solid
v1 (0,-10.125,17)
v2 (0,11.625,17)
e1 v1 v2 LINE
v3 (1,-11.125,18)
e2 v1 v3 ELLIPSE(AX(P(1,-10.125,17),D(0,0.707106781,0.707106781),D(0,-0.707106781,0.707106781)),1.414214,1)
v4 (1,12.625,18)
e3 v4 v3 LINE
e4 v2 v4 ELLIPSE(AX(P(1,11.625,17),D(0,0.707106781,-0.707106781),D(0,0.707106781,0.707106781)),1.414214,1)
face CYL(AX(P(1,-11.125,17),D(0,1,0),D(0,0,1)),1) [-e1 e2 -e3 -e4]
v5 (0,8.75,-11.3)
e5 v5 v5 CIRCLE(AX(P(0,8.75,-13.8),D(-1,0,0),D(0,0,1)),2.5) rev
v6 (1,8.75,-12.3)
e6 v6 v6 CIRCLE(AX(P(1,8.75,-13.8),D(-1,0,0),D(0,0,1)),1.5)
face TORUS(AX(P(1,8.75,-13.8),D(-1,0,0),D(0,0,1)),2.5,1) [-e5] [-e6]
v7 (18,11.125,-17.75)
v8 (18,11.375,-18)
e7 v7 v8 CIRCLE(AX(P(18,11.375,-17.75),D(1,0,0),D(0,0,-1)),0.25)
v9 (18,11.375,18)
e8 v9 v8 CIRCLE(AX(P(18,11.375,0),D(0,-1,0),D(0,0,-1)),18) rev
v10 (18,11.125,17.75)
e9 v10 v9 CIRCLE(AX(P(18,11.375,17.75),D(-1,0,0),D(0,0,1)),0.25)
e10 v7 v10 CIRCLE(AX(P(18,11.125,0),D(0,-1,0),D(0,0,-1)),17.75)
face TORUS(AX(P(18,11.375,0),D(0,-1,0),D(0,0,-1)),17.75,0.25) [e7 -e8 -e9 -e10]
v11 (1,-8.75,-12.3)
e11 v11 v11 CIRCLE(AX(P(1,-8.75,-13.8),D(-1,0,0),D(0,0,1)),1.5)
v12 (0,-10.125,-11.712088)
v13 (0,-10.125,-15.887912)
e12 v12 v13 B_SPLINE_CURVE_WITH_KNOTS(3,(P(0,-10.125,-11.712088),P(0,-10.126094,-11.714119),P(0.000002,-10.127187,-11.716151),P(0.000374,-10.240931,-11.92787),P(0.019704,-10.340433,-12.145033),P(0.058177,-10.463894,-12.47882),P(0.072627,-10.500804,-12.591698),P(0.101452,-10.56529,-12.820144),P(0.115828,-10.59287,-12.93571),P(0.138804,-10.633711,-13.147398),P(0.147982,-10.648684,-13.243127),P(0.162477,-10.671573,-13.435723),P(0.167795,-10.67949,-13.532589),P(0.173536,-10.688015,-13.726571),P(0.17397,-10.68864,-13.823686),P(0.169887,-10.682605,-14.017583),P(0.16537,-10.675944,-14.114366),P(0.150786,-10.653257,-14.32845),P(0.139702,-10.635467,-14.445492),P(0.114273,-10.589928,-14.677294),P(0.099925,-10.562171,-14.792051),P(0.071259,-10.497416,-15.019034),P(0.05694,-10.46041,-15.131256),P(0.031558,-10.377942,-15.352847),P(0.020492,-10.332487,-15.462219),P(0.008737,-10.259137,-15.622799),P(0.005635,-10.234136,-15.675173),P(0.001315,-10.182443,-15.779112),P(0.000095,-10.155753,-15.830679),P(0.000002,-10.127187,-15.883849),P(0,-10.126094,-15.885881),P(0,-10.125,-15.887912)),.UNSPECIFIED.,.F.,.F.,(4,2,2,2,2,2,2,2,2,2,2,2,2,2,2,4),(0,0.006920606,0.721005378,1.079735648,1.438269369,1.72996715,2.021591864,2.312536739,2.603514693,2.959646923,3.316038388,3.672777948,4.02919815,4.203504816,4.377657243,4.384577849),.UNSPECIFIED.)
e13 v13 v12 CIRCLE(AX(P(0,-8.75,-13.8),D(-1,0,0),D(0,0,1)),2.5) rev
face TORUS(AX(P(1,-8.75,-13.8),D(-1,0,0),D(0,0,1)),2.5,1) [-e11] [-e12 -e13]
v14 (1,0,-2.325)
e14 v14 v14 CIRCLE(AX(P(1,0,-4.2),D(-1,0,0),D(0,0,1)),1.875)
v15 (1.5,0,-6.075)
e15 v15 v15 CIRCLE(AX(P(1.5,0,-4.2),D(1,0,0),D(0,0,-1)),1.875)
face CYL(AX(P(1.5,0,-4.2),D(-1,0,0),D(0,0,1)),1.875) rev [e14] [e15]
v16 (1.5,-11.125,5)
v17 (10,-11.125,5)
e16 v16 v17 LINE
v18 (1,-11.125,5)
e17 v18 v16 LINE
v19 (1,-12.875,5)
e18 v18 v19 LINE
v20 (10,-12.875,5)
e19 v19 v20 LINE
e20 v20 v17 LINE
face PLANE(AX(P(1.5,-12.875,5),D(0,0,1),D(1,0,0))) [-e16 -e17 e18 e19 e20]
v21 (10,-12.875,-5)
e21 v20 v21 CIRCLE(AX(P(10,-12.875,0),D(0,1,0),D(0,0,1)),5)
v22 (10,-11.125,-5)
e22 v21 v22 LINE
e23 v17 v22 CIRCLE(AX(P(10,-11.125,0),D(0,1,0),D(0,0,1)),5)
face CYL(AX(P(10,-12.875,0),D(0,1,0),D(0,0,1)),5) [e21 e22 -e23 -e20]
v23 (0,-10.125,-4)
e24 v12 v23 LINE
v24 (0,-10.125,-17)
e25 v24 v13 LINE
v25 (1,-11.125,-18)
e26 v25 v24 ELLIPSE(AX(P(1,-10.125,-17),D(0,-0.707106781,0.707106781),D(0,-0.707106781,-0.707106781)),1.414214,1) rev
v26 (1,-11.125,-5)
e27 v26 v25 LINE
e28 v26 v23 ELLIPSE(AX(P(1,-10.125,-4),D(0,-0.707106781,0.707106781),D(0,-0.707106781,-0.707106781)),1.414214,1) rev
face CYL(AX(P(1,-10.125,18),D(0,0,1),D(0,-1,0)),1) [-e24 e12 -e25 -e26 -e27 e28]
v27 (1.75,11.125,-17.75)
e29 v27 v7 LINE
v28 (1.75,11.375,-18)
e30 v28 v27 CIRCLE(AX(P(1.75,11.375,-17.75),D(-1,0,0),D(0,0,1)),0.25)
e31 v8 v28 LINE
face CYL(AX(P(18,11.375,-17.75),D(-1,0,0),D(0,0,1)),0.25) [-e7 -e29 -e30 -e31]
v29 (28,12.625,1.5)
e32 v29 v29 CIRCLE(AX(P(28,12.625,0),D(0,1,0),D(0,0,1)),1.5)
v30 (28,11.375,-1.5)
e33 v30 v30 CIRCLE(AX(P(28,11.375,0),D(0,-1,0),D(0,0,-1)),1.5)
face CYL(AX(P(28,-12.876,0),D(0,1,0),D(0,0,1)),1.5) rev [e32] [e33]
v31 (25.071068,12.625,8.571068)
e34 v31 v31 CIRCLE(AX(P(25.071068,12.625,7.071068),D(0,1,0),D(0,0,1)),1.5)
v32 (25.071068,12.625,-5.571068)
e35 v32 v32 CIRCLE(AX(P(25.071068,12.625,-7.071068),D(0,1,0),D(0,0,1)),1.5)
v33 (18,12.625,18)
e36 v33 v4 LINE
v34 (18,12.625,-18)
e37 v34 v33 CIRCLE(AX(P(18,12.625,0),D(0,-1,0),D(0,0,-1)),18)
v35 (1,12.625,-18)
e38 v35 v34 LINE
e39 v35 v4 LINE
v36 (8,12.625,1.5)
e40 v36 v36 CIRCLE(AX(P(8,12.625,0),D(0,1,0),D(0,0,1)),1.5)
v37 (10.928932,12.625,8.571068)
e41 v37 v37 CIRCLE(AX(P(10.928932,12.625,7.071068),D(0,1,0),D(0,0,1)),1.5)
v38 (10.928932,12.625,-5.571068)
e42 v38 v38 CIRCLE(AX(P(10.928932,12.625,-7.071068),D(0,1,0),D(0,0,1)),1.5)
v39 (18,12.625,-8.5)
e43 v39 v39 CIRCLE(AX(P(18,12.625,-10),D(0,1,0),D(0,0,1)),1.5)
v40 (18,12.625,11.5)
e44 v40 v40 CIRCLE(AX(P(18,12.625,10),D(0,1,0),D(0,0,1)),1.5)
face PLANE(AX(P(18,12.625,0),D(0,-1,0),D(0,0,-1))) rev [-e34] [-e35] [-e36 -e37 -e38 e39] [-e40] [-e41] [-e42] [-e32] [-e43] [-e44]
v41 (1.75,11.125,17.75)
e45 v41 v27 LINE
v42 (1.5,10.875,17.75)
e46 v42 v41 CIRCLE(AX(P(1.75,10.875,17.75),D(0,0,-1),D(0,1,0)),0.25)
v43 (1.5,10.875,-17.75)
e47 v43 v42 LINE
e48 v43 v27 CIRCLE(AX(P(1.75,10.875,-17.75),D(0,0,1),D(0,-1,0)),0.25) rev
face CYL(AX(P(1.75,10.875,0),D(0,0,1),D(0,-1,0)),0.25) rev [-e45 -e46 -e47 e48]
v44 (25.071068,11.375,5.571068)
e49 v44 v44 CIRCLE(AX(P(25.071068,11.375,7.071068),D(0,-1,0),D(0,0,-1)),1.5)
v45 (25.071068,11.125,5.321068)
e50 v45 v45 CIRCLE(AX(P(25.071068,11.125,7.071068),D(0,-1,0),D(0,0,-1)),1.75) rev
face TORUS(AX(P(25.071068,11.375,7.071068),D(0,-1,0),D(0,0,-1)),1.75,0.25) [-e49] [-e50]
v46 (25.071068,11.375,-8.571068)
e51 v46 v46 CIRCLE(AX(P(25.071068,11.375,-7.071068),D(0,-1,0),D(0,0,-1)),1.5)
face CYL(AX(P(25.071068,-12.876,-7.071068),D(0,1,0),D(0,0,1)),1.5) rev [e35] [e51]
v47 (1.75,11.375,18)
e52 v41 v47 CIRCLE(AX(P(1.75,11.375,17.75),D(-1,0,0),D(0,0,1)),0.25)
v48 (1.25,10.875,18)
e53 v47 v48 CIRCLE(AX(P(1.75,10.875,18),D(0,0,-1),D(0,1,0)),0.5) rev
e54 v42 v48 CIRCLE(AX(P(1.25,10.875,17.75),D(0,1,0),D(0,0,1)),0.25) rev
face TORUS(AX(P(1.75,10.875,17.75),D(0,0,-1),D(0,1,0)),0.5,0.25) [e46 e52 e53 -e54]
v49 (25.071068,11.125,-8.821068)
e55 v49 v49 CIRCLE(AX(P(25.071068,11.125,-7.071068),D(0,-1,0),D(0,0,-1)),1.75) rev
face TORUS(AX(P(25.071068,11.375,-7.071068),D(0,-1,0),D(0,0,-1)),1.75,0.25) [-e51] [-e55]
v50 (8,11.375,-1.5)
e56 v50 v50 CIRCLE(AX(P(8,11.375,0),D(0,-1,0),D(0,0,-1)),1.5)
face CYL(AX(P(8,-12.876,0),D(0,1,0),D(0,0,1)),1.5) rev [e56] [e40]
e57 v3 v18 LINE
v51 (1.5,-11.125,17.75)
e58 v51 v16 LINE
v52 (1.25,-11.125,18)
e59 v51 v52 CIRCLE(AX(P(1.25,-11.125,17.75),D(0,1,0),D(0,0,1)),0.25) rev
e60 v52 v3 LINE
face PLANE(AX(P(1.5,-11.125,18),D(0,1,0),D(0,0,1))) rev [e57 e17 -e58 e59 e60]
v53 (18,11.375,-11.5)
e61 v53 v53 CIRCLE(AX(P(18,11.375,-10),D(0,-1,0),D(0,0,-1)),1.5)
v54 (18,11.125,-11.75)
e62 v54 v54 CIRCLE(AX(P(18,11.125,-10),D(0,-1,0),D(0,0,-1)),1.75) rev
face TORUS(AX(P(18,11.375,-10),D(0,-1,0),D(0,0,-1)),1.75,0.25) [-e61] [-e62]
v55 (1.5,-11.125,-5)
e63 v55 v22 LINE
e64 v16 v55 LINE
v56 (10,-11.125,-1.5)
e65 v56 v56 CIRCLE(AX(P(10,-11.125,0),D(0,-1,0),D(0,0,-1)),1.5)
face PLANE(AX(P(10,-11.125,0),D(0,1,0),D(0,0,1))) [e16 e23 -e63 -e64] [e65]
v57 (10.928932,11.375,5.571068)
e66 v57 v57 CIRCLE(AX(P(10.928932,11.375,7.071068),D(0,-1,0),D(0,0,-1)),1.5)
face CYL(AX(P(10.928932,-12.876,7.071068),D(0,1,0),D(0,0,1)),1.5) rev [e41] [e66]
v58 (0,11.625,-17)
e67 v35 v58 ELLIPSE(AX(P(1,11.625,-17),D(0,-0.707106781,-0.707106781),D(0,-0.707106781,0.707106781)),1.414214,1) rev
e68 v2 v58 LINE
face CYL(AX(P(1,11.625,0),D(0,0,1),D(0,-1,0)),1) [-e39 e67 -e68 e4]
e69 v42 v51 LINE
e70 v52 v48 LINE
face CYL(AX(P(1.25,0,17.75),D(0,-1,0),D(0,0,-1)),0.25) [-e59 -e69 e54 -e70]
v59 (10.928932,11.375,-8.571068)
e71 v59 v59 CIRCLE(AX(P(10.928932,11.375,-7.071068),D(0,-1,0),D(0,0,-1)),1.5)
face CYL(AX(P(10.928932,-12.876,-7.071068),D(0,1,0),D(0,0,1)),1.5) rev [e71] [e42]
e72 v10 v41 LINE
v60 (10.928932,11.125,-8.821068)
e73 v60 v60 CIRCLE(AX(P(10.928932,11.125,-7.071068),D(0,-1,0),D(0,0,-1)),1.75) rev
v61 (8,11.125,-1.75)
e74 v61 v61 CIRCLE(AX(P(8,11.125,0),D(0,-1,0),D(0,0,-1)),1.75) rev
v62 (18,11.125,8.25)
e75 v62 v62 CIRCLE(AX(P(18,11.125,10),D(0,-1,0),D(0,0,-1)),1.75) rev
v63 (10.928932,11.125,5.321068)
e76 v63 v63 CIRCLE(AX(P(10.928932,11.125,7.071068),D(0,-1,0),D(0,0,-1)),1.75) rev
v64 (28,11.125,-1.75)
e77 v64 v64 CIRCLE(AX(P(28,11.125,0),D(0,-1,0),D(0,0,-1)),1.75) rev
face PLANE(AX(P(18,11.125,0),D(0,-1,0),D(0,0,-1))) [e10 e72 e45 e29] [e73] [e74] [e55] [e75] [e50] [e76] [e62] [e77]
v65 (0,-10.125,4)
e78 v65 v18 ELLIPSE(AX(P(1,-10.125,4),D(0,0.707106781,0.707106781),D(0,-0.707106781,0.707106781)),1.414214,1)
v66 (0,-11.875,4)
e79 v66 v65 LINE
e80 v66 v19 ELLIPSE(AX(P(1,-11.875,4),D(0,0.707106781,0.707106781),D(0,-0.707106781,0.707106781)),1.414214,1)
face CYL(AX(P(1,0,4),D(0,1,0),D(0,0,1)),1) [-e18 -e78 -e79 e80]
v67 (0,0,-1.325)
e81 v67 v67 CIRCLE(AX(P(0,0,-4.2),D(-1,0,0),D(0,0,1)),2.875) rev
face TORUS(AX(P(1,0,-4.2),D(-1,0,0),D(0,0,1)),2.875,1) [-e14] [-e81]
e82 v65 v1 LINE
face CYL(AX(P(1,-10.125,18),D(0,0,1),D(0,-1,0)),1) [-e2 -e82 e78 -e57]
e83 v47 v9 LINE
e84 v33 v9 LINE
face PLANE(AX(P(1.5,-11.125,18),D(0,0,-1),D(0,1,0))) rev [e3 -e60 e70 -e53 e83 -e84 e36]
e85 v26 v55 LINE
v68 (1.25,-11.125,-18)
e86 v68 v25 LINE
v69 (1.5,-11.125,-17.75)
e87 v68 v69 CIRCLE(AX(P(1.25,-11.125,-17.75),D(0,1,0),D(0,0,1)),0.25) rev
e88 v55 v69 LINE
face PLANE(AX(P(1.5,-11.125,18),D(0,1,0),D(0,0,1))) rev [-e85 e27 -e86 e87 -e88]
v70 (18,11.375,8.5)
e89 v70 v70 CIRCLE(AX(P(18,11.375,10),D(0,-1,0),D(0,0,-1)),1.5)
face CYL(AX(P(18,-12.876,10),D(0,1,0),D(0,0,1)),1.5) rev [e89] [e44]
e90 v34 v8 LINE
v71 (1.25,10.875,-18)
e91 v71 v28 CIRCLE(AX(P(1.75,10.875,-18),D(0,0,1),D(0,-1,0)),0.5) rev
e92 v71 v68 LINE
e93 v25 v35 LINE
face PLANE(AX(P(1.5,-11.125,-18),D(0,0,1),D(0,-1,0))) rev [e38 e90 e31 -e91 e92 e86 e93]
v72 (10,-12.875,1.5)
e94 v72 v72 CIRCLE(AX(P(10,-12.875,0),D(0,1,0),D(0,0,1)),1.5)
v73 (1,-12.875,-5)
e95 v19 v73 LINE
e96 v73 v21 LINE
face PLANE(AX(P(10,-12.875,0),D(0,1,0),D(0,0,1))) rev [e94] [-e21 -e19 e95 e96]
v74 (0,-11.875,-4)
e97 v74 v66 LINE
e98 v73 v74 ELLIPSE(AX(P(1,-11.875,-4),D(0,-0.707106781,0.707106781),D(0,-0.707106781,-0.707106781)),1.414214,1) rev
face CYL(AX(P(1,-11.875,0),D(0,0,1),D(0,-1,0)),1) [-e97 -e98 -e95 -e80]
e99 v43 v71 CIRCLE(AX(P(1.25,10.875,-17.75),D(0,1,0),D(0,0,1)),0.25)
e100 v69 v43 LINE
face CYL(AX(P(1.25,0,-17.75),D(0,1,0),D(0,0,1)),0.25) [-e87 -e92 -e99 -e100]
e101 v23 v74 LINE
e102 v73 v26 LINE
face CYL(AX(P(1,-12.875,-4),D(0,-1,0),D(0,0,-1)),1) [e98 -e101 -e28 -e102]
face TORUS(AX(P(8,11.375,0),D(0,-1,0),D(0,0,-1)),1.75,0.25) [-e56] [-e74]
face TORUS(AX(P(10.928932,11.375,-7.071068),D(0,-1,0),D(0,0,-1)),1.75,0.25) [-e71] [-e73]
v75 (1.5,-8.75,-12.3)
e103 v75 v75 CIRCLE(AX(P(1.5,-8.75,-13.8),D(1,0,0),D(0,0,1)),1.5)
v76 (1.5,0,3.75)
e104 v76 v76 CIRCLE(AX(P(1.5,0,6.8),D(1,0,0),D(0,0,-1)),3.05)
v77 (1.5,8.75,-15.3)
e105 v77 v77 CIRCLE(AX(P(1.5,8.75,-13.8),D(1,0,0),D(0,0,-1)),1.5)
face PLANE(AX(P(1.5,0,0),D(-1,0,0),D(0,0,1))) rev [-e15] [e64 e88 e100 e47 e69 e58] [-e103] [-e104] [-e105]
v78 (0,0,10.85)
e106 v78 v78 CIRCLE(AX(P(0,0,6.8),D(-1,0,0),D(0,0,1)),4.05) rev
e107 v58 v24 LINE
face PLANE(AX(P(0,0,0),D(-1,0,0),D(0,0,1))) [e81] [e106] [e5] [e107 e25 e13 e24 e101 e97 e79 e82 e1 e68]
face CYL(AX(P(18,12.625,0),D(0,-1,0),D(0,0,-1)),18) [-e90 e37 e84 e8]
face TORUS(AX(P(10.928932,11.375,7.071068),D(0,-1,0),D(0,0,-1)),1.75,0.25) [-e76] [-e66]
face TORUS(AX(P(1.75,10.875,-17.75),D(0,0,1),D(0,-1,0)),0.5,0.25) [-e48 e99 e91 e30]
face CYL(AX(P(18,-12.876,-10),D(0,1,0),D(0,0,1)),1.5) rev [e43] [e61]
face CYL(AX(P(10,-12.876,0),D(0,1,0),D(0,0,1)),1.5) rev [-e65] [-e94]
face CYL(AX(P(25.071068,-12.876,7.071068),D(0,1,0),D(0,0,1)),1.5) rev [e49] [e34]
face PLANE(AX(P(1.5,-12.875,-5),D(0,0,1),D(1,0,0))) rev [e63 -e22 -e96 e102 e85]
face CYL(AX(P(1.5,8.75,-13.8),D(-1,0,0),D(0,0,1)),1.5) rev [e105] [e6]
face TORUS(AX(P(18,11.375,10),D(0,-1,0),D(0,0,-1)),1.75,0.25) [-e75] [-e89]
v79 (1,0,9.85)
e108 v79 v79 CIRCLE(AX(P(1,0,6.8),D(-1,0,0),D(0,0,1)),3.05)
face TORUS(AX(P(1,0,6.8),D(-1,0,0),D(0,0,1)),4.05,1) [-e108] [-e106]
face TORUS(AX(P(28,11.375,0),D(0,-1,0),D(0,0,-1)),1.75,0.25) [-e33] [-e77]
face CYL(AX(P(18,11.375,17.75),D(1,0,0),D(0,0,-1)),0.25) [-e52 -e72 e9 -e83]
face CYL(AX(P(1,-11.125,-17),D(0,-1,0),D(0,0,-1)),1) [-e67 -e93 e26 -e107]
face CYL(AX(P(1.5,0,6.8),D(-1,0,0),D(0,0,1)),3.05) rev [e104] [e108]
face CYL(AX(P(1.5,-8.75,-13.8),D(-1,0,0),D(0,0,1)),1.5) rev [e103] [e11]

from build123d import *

# Parameters (mm, degrees)
CROQUIS1_W              = 36
CROQUIS1_H              = 22.25
CROQUIS1_R              = 1.5
CROQUIS1_R_2            = 3.05
CROQUIS1_R_3            = 1.875
SALIENTE_EXTRUIR1_DEPTH = 1.5
SALIENTE_EXTRUIR3_START = -22.25
SALIENTE_EXTRUIR3_DEPTH = 1.5
SALIENTE_EXTRUIR4_START = 22.25
CROQUIS4_W              = 1.5
CROQUIS4_H              = 10
SALIENTE_EXTRUIR4_DEPTH = 1.75
CORTAR_EXTRUIR1_REACH   = 48.734
CROQUIS5_R              = 1.5
CORTAR_EXTRUIR2_REACH   = 49.647
CROQUIS7_R              = 1.5
REDONDEO2_R             = 1
REDONDEO3_R             = 0.25


with BuildPart() as part:
    # Croquis1 → Saliente-Extruir1 (new body)
    with BuildSketch(Plane(origin=(0, 0, 0), x_dir=(0, 0, -1), z_dir=(1, 0, 0))):
        Rectangle(CROQUIS1_W, CROQUIS1_H)
        with Locations((13.8, 8.75)):
            Circle(CROQUIS1_R, mode=Mode.SUBTRACT)
        with Locations((-6.8, 0)):
            Circle(CROQUIS1_R_2, mode=Mode.SUBTRACT)
        with Locations(Location((13.8, -8.75, 0), (0, 0, 180))):
            Circle(CROQUIS1_R, mode=Mode.SUBTRACT)
        with Locations((4.2, 0)):
            Circle(CROQUIS1_R_3, mode=Mode.SUBTRACT)
    extrude(amount=SALIENTE_EXTRUIR1_DEPTH)

    # Croquis3<2> → Saliente-Extruir3 (add)
    with BuildSketch(Plane.XZ.offset(11.125).offset(SALIENTE_EXTRUIR3_START)):
        with BuildLine():
            Line((18, -18), (0, -18))
            Line((0, -18), (0, 18))
            Line((0, 18), (18, 18))
            ThreePointArc((18, 18), (36, 0), (18, -18))
        make_face()
    extrude(amount=-SALIENTE_EXTRUIR3_DEPTH)

    # Croquis4 → Saliente-Extruir4 (add)
    with BuildSketch(Plane(origin=(0, 11.125, 0), x_dir=(-1, 0, 0), z_dir=(0, -1, 0)).offset(SALIENTE_EXTRUIR4_START)):
        with BuildLine():
            Line((-1.5, -5), (-1.5, 5))
            Line((-1.5, 5), (-10, 5))
            ThreePointArc((-10, 5), (-15, 0), (-10, -5))
            Line((-10, -5), (-1.5, -5))
        make_face()
        with Locations((-0.75, 0)):
            Rectangle(CROQUIS4_W, CROQUIS4_H)
    extrude(amount=SALIENTE_EXTRUIR4_DEPTH)

    # Croquis5 → Cortar-Extruir1 (cut, up to next)
    with BuildSketch(Plane(origin=(0, -11.125, 0), x_dir=(-1, 0, 0), z_dir=(0, -1, 0)), mode=Mode.PRIVATE) as cortar_extruir1_sk1:
        with Locations(Location((-10, 0, 0), (0, 0, 270))):
            Circle(CROQUIS5_R)
    cortar_extruir1_tool1 = extrude(cortar_extruir1_sk1.sketch, amount=CORTAR_EXTRUIR1_REACH, mode=Mode.PRIVATE) & part.part
    add(cortar_extruir1_tool1.solids().sort_by_distance((10, -11.125, 0))[0], mode=Mode.SUBTRACT)

    # Croquis7 → Cortar-Extruir2 (cut, up to next)
    with BuildSketch(Plane(origin=(0, 12.625, 0), x_dir=(-1, 0, 0), z_dir=(0, 1, 0)), mode=Mode.PRIVATE) as cortar_extruir2_sk1:
        with Locations(Location((-8, 0, 0), (0, 0, 90))):
            Circle(CROQUIS7_R)
    cortar_extruir2_tool1 = extrude(cortar_extruir2_sk1.sketch, amount=-CORTAR_EXTRUIR2_REACH, mode=Mode.PRIVATE) & part.part
    # Croquis7 → Cortar-Extruir2 (cut, up to next)
    with BuildSketch(Plane(origin=(0, 12.625, 0), x_dir=(-1, 0, 0), z_dir=(0, 1, 0)), mode=Mode.PRIVATE) as cortar_extruir2_sk2:
        with Locations(Location((-10.928932188, -7.071067812, 0), (0, 0, 90))):
            Circle(CROQUIS7_R)
    cortar_extruir2_tool2 = extrude(cortar_extruir2_sk2.sketch, amount=-CORTAR_EXTRUIR2_REACH, mode=Mode.PRIVATE) & part.part
    # Croquis7 → Cortar-Extruir2 (cut, up to next)
    with BuildSketch(Plane(origin=(0, 12.625, 0), x_dir=(-1, 0, 0), z_dir=(0, 1, 0)), mode=Mode.PRIVATE) as cortar_extruir2_sk3:
        with Locations(Location((-18, -10, 0), (0, 0, 90))):
            Circle(CROQUIS7_R)
    cortar_extruir2_tool3 = extrude(cortar_extruir2_sk3.sketch, amount=-CORTAR_EXTRUIR2_REACH, mode=Mode.PRIVATE) & part.part
    # Croquis7 → Cortar-Extruir2 (cut, up to next)
    with BuildSketch(Plane(origin=(0, 12.625, 0), x_dir=(-1, 0, 0), z_dir=(0, 1, 0)), mode=Mode.PRIVATE) as cortar_extruir2_sk4:
        with Locations(Location((-25.071067812, -7.071067812, 0), (0, 0, 90))):
            Circle(CROQUIS7_R)
    cortar_extruir2_tool4 = extrude(cortar_extruir2_sk4.sketch, amount=-CORTAR_EXTRUIR2_REACH, mode=Mode.PRIVATE) & part.part
    # Croquis7 → Cortar-Extruir2 (cut, up to next)
    with BuildSketch(Plane(origin=(0, 12.625, 0), x_dir=(-1, 0, 0), z_dir=(0, 1, 0)), mode=Mode.PRIVATE) as cortar_extruir2_sk5:
        with Locations(Location((-28, 0, 0), (0, 0, 90))):
            Circle(CROQUIS7_R)
    cortar_extruir2_tool5 = extrude(cortar_extruir2_sk5.sketch, amount=-CORTAR_EXTRUIR2_REACH, mode=Mode.PRIVATE) & part.part
    # Croquis7 → Cortar-Extruir2 (cut, up to next)
    with BuildSketch(Plane(origin=(0, 12.625, 0), x_dir=(-1, 0, 0), z_dir=(0, 1, 0)), mode=Mode.PRIVATE) as cortar_extruir2_sk6:
        with Locations(Location((-25.071067812, 7.071067812, 0), (0, 0, 90))):
            Circle(CROQUIS7_R)
    cortar_extruir2_tool6 = extrude(cortar_extruir2_sk6.sketch, amount=-CORTAR_EXTRUIR2_REACH, mode=Mode.PRIVATE) & part.part
    # Croquis7 → Cortar-Extruir2 (cut, up to next)
    with BuildSketch(Plane(origin=(0, 12.625, 0), x_dir=(-1, 0, 0), z_dir=(0, 1, 0)), mode=Mode.PRIVATE) as cortar_extruir2_sk7:
        with Locations(Location((-18, 10, 0), (0, 0, 90))):
            Circle(CROQUIS7_R)
    cortar_extruir2_tool7 = extrude(cortar_extruir2_sk7.sketch, amount=-CORTAR_EXTRUIR2_REACH, mode=Mode.PRIVATE) & part.part
    # Croquis7 → Cortar-Extruir2 (cut, up to next)
    with BuildSketch(Plane(origin=(0, 12.625, 0), x_dir=(-1, 0, 0), z_dir=(0, 1, 0)), mode=Mode.PRIVATE) as cortar_extruir2_sk8:
        with Locations(Location((-10.928932188, 7.071067812, 0), (0, 0, 90))):
            Circle(CROQUIS7_R)
    cortar_extruir2_tool8 = extrude(cortar_extruir2_sk8.sketch, amount=-CORTAR_EXTRUIR2_REACH, mode=Mode.PRIVATE) & part.part
    add(cortar_extruir2_tool1.solids().sort_by_distance((8, 12.625, 0))[0], mode=Mode.SUBTRACT)
    add(cortar_extruir2_tool2.solids().sort_by_distance((10.928932, 12.625, -7.071068))[0], mode=Mode.SUBTRACT)
    add(cortar_extruir2_tool3.solids().sort_by_distance((18, 12.625, -10))[0], mode=Mode.SUBTRACT)
    add(cortar_extruir2_tool4.solids().sort_by_distance((25.071068, 12.625, -7.071068))[0], mode=Mode.SUBTRACT)
    add(cortar_extruir2_tool5.solids().sort_by_distance((28, 12.625, 0))[0], mode=Mode.SUBTRACT)
    add(cortar_extruir2_tool6.solids().sort_by_distance((25.071068, 12.625, 7.071068))[0], mode=Mode.SUBTRACT)
    add(cortar_extruir2_tool7.solids().sort_by_distance((18, 12.625, 10))[0], mode=Mode.SUBTRACT)
    add(cortar_extruir2_tool8.solids().sort_by_distance((10.928932, 12.625, 7.071068))[0], mode=Mode.SUBTRACT)

    # Redondeo2
    # the kernel refuses this fillet: 1 mm, written as the material it takes off along each edge
    with BuildSketch(Plane(origin=(0, 8.75, -13.8), x_dir=(0, 0, -1), z_dir=(0, -1, 0))) as redondeo2_piece_1:
        with BuildLine():
            CenterArc((1.5 + REDONDEO2_R, REDONDEO2_R), REDONDEO2_R, 180, 90)
            Line((1.5, REDONDEO2_R), (1.5, 0))
            Line((1.5, 0), (1.5 + REDONDEO2_R, 0))
        make_face()
    revolve(axis=Axis((0, 8.75, -13.8), (1, 0, 0)), mode=Mode.SUBTRACT)
    with BuildSketch(Plane(origin=(0, 0, 6.8), x_dir=(0, 0, -1), z_dir=(0, -1, 0))) as redondeo2_piece_2:
        with BuildLine():
            CenterArc((3.05 + REDONDEO2_R, REDONDEO2_R), REDONDEO2_R, 180, 90)
            Line((3.05, REDONDEO2_R), (3.05, 0))
            Line((3.05, 0), (3.05 + REDONDEO2_R, 0))
        make_face()
    revolve(axis=Axis((0, 0, 6.8), (1, 0, 0)), mode=Mode.SUBTRACT)
    with BuildSketch(Plane(origin=(0, -8.75, -13.8), x_dir=(0, 0, 1), z_dir=(0, 1, 0))) as redondeo2_piece_3:
        with BuildLine():
            CenterArc((1.5 + REDONDEO2_R, REDONDEO2_R), REDONDEO2_R, 180, 90)
            Line((1.5, REDONDEO2_R), (1.5, 0))
            Line((1.5, 0), (1.5 + REDONDEO2_R, 0))
        make_face()
    revolve(axis=Axis((0, -8.75, -13.8), (1, 0, 0)), mode=Mode.SUBTRACT)
    with BuildSketch(Plane(origin=(0, 0, -4.2), x_dir=(0, 0, -1), z_dir=(0, -1, 0))) as redondeo2_piece_4:
        with BuildLine():
            CenterArc((1.875 + REDONDEO2_R, REDONDEO2_R), REDONDEO2_R, 180, 90)
            Line((1.875, REDONDEO2_R), (1.875, 0))
            Line((1.875, 0), (1.875 + REDONDEO2_R, 0))
        make_face()
    revolve(axis=Axis((0, 0, -4.2), (1, 0, 0)), mode=Mode.SUBTRACT)
    with BuildSketch(Plane(origin=(0, 12.625, -20.5), x_dir=(0, -1, 0), z_dir=(0, 0, 1))) as redondeo2_piece_5:
        with BuildLine():
            CenterArc((REDONDEO2_R, REDONDEO2_R), REDONDEO2_R, 180, 90)
            Line((0, REDONDEO2_R), (0, 0))
            Line((0, 0), (REDONDEO2_R, 0))
        make_face()
    extrude(amount=41, mode=Mode.SUBTRACT)
    with BuildSketch(Plane(origin=(0, -11.125, -5), x_dir=(0, 1, 0), z_dir=(0, 0, -1))) as redondeo2_piece_6:
        with BuildLine():
            CenterArc((REDONDEO2_R, REDONDEO2_R), REDONDEO2_R, 180, 90)
            Line((0, REDONDEO2_R), (0, 0))
            Line((0, 0), (REDONDEO2_R, 0))
        make_face()
    extrude(amount=15.5, mode=Mode.SUBTRACT)
    with BuildSketch(Plane(origin=(0, -11.125, -5), x_dir=(0, 0, 1), z_dir=(0, -1, 0))) as redondeo2_piece_7:
        with BuildLine():
            CenterArc((REDONDEO2_R, -REDONDEO2_R), REDONDEO2_R, 90, 90)
            Line((0, -REDONDEO2_R), (0, 0))
            Line((0, 0), (REDONDEO2_R, 0))
        make_face()
    extrude(amount=4.25, mode=Mode.SUBTRACT)
    with BuildSketch(Plane(origin=(0, -11.125, 5), x_dir=(0, 0, -1), z_dir=(0, -1, 0))) as redondeo2_piece_8:
        with BuildLine():
            CenterArc((REDONDEO2_R, REDONDEO2_R), REDONDEO2_R, 180, 90)
            Line((0, REDONDEO2_R), (0, 0))
            Line((0, 0), (REDONDEO2_R, 0))
        make_face()
    extrude(amount=4.25, mode=Mode.SUBTRACT)
    with BuildSketch(Plane(origin=(0, -12.875, 7.5), x_dir=(0, 1, 0), z_dir=(0, 0, -1))) as redondeo2_piece_9:
        with BuildLine():
            CenterArc((REDONDEO2_R, REDONDEO2_R), REDONDEO2_R, 180, 90)
            Line((0, REDONDEO2_R), (0, 0))
            Line((0, 0), (REDONDEO2_R, 0))
        make_face()
    extrude(amount=15, mode=Mode.SUBTRACT)
    with BuildSketch(Plane(origin=(0, -11.125, 20.5), x_dir=(1, 0, 0), z_dir=(0, 0, -1))) as redondeo2_piece_10:
        with BuildLine():
            CenterArc((REDONDEO2_R, -REDONDEO2_R), REDONDEO2_R, 90, 90)
            Line((0, -REDONDEO2_R), (0, 0))
            Line((0, 0), (REDONDEO2_R, 0))
        make_face()
    extrude(amount=15.5, mode=Mode.SUBTRACT)
    with BuildSketch(Plane(origin=(0, 15.125, 18), x_dir=(0, 0, -1), z_dir=(0, -1, 0)), Plane(origin=(0, -13.625, -18), x_dir=(0, 0, 1), z_dir=(0, 1, 0))) as redondeo2_piece_11:
        with BuildLine():
            CenterArc((REDONDEO2_R, REDONDEO2_R), REDONDEO2_R, 180, 90)
            Line((0, REDONDEO2_R), (0, 0))
            Line((0, 0), (REDONDEO2_R, 0))
        make_face()
    extrude(amount=28.75, mode=Mode.SUBTRACT)
    with BuildSketch(Plane(origin=(0, -8.625, -5), x_dir=(0, 0, 1), z_dir=(0, -1, 0))) as redondeo2_piece_12a_section:
        with BuildLine():
            CenterArc((REDONDEO2_R, -REDONDEO2_R), REDONDEO2_R, 90, 90)
            Line((0, -REDONDEO2_R), (0, 0))
            Line((0, 0), (REDONDEO2_R, 0))
        make_face()
    redondeo2_piece_12a = extrude(amount=6.75, mode=Mode.PRIVATE)
    redondeo2_piece_12a = split(redondeo2_piece_12a, bisect_by=Plane(origin=(0.226395114, -11.125, -4.773604886), z_dir=(0, 1, 0)), keep=Keep.TOP, mode=Mode.PRIVATE)
    with BuildSketch(Plane(origin=(0, -11.125, -2.5), x_dir=(0, 1, 0), z_dir=(0, 0, -1))) as redondeo2_piece_12b_section:
        with BuildLine():
            CenterArc((REDONDEO2_R, REDONDEO2_R), REDONDEO2_R, 180, 90)
            Line((0, REDONDEO2_R), (0, 0))
            Line((0, 0), (REDONDEO2_R, 0))
        make_face()
    redondeo2_piece_12b = extrude(amount=18, mode=Mode.PRIVATE)
    redondeo2_piece_12b = split(redondeo2_piece_12b, bisect_by=Plane(origin=(0.226395114, -10.898604886, -5), z_dir=(0, 0, 1)), keep=Keep.TOP, mode=Mode.PRIVATE)
    redondeo2_piece_12 = redondeo2_piece_12a & redondeo2_piece_12b
    add(redondeo2_piece_12, mode=Mode.SUBTRACT)
    with BuildSketch(Plane(origin=(0, -11.125, 20.5), x_dir=(1, 0, 0), z_dir=(0, 0, -1))) as redondeo2_piece_13a_section:
        with BuildLine():
            CenterArc((REDONDEO2_R, -REDONDEO2_R), REDONDEO2_R, 90, 90)
            Line((0, -REDONDEO2_R), (0, 0))
            Line((0, 0), (REDONDEO2_R, 0))
        make_face()
    redondeo2_piece_13a = extrude(amount=18, mode=Mode.PRIVATE)
    redondeo2_piece_13a = split(redondeo2_piece_13a, bisect_by=Plane(origin=(0.226395114, -10.898604886, 5), z_dir=(0, 0, -1)), keep=Keep.TOP, mode=Mode.PRIVATE)
    with BuildSketch(Plane(origin=(0, -8.625, 5), x_dir=(0, 0, -1), z_dir=(0, -1, 0))) as redondeo2_piece_13b_section:
        with BuildLine():
            CenterArc((REDONDEO2_R, REDONDEO2_R), REDONDEO2_R, 180, 90)
            Line((0, REDONDEO2_R), (0, 0))
            Line((0, 0), (REDONDEO2_R, 0))
        make_face()
    redondeo2_piece_13b = extrude(amount=6.75, mode=Mode.PRIVATE)
    redondeo2_piece_13b = split(redondeo2_piece_13b, bisect_by=Plane(origin=(0.226395114, -11.125, 4.773604886), z_dir=(0, 1, 0)), keep=Keep.TOP, mode=Mode.PRIVATE)
    redondeo2_piece_13 = redondeo2_piece_13a & redondeo2_piece_13b
    add(redondeo2_piece_13, mode=Mode.SUBTRACT)

    # Redondeo3
    redondeo3_edges = [part.edges().sort_by_distance(p)[0] for p in [
        (1.5, 0, 18),
        (9.75, 11.125, -18),
        (36, 11.125, 0),
        (9.75, 11.125, 18),
        (1.5, 0, -18),
        (10.928932188, 11.125, 5.571067812),
        (18, 11.125, 8.5),
        (25.071067812, 11.125, 5.571067812),
        (28, 11.125, -1.5),
        (25.071067812, 11.125, -8.571067812),
        (18, 11.125, -11.5),
        (10.928932188, 11.125, -8.571067812),
        (8, 11.125, -1.5),
        (1.5, 11.125, 0),
    ]]
    fillet(redondeo3_edges, radius=REDONDEO3_R)


solid = part.part
